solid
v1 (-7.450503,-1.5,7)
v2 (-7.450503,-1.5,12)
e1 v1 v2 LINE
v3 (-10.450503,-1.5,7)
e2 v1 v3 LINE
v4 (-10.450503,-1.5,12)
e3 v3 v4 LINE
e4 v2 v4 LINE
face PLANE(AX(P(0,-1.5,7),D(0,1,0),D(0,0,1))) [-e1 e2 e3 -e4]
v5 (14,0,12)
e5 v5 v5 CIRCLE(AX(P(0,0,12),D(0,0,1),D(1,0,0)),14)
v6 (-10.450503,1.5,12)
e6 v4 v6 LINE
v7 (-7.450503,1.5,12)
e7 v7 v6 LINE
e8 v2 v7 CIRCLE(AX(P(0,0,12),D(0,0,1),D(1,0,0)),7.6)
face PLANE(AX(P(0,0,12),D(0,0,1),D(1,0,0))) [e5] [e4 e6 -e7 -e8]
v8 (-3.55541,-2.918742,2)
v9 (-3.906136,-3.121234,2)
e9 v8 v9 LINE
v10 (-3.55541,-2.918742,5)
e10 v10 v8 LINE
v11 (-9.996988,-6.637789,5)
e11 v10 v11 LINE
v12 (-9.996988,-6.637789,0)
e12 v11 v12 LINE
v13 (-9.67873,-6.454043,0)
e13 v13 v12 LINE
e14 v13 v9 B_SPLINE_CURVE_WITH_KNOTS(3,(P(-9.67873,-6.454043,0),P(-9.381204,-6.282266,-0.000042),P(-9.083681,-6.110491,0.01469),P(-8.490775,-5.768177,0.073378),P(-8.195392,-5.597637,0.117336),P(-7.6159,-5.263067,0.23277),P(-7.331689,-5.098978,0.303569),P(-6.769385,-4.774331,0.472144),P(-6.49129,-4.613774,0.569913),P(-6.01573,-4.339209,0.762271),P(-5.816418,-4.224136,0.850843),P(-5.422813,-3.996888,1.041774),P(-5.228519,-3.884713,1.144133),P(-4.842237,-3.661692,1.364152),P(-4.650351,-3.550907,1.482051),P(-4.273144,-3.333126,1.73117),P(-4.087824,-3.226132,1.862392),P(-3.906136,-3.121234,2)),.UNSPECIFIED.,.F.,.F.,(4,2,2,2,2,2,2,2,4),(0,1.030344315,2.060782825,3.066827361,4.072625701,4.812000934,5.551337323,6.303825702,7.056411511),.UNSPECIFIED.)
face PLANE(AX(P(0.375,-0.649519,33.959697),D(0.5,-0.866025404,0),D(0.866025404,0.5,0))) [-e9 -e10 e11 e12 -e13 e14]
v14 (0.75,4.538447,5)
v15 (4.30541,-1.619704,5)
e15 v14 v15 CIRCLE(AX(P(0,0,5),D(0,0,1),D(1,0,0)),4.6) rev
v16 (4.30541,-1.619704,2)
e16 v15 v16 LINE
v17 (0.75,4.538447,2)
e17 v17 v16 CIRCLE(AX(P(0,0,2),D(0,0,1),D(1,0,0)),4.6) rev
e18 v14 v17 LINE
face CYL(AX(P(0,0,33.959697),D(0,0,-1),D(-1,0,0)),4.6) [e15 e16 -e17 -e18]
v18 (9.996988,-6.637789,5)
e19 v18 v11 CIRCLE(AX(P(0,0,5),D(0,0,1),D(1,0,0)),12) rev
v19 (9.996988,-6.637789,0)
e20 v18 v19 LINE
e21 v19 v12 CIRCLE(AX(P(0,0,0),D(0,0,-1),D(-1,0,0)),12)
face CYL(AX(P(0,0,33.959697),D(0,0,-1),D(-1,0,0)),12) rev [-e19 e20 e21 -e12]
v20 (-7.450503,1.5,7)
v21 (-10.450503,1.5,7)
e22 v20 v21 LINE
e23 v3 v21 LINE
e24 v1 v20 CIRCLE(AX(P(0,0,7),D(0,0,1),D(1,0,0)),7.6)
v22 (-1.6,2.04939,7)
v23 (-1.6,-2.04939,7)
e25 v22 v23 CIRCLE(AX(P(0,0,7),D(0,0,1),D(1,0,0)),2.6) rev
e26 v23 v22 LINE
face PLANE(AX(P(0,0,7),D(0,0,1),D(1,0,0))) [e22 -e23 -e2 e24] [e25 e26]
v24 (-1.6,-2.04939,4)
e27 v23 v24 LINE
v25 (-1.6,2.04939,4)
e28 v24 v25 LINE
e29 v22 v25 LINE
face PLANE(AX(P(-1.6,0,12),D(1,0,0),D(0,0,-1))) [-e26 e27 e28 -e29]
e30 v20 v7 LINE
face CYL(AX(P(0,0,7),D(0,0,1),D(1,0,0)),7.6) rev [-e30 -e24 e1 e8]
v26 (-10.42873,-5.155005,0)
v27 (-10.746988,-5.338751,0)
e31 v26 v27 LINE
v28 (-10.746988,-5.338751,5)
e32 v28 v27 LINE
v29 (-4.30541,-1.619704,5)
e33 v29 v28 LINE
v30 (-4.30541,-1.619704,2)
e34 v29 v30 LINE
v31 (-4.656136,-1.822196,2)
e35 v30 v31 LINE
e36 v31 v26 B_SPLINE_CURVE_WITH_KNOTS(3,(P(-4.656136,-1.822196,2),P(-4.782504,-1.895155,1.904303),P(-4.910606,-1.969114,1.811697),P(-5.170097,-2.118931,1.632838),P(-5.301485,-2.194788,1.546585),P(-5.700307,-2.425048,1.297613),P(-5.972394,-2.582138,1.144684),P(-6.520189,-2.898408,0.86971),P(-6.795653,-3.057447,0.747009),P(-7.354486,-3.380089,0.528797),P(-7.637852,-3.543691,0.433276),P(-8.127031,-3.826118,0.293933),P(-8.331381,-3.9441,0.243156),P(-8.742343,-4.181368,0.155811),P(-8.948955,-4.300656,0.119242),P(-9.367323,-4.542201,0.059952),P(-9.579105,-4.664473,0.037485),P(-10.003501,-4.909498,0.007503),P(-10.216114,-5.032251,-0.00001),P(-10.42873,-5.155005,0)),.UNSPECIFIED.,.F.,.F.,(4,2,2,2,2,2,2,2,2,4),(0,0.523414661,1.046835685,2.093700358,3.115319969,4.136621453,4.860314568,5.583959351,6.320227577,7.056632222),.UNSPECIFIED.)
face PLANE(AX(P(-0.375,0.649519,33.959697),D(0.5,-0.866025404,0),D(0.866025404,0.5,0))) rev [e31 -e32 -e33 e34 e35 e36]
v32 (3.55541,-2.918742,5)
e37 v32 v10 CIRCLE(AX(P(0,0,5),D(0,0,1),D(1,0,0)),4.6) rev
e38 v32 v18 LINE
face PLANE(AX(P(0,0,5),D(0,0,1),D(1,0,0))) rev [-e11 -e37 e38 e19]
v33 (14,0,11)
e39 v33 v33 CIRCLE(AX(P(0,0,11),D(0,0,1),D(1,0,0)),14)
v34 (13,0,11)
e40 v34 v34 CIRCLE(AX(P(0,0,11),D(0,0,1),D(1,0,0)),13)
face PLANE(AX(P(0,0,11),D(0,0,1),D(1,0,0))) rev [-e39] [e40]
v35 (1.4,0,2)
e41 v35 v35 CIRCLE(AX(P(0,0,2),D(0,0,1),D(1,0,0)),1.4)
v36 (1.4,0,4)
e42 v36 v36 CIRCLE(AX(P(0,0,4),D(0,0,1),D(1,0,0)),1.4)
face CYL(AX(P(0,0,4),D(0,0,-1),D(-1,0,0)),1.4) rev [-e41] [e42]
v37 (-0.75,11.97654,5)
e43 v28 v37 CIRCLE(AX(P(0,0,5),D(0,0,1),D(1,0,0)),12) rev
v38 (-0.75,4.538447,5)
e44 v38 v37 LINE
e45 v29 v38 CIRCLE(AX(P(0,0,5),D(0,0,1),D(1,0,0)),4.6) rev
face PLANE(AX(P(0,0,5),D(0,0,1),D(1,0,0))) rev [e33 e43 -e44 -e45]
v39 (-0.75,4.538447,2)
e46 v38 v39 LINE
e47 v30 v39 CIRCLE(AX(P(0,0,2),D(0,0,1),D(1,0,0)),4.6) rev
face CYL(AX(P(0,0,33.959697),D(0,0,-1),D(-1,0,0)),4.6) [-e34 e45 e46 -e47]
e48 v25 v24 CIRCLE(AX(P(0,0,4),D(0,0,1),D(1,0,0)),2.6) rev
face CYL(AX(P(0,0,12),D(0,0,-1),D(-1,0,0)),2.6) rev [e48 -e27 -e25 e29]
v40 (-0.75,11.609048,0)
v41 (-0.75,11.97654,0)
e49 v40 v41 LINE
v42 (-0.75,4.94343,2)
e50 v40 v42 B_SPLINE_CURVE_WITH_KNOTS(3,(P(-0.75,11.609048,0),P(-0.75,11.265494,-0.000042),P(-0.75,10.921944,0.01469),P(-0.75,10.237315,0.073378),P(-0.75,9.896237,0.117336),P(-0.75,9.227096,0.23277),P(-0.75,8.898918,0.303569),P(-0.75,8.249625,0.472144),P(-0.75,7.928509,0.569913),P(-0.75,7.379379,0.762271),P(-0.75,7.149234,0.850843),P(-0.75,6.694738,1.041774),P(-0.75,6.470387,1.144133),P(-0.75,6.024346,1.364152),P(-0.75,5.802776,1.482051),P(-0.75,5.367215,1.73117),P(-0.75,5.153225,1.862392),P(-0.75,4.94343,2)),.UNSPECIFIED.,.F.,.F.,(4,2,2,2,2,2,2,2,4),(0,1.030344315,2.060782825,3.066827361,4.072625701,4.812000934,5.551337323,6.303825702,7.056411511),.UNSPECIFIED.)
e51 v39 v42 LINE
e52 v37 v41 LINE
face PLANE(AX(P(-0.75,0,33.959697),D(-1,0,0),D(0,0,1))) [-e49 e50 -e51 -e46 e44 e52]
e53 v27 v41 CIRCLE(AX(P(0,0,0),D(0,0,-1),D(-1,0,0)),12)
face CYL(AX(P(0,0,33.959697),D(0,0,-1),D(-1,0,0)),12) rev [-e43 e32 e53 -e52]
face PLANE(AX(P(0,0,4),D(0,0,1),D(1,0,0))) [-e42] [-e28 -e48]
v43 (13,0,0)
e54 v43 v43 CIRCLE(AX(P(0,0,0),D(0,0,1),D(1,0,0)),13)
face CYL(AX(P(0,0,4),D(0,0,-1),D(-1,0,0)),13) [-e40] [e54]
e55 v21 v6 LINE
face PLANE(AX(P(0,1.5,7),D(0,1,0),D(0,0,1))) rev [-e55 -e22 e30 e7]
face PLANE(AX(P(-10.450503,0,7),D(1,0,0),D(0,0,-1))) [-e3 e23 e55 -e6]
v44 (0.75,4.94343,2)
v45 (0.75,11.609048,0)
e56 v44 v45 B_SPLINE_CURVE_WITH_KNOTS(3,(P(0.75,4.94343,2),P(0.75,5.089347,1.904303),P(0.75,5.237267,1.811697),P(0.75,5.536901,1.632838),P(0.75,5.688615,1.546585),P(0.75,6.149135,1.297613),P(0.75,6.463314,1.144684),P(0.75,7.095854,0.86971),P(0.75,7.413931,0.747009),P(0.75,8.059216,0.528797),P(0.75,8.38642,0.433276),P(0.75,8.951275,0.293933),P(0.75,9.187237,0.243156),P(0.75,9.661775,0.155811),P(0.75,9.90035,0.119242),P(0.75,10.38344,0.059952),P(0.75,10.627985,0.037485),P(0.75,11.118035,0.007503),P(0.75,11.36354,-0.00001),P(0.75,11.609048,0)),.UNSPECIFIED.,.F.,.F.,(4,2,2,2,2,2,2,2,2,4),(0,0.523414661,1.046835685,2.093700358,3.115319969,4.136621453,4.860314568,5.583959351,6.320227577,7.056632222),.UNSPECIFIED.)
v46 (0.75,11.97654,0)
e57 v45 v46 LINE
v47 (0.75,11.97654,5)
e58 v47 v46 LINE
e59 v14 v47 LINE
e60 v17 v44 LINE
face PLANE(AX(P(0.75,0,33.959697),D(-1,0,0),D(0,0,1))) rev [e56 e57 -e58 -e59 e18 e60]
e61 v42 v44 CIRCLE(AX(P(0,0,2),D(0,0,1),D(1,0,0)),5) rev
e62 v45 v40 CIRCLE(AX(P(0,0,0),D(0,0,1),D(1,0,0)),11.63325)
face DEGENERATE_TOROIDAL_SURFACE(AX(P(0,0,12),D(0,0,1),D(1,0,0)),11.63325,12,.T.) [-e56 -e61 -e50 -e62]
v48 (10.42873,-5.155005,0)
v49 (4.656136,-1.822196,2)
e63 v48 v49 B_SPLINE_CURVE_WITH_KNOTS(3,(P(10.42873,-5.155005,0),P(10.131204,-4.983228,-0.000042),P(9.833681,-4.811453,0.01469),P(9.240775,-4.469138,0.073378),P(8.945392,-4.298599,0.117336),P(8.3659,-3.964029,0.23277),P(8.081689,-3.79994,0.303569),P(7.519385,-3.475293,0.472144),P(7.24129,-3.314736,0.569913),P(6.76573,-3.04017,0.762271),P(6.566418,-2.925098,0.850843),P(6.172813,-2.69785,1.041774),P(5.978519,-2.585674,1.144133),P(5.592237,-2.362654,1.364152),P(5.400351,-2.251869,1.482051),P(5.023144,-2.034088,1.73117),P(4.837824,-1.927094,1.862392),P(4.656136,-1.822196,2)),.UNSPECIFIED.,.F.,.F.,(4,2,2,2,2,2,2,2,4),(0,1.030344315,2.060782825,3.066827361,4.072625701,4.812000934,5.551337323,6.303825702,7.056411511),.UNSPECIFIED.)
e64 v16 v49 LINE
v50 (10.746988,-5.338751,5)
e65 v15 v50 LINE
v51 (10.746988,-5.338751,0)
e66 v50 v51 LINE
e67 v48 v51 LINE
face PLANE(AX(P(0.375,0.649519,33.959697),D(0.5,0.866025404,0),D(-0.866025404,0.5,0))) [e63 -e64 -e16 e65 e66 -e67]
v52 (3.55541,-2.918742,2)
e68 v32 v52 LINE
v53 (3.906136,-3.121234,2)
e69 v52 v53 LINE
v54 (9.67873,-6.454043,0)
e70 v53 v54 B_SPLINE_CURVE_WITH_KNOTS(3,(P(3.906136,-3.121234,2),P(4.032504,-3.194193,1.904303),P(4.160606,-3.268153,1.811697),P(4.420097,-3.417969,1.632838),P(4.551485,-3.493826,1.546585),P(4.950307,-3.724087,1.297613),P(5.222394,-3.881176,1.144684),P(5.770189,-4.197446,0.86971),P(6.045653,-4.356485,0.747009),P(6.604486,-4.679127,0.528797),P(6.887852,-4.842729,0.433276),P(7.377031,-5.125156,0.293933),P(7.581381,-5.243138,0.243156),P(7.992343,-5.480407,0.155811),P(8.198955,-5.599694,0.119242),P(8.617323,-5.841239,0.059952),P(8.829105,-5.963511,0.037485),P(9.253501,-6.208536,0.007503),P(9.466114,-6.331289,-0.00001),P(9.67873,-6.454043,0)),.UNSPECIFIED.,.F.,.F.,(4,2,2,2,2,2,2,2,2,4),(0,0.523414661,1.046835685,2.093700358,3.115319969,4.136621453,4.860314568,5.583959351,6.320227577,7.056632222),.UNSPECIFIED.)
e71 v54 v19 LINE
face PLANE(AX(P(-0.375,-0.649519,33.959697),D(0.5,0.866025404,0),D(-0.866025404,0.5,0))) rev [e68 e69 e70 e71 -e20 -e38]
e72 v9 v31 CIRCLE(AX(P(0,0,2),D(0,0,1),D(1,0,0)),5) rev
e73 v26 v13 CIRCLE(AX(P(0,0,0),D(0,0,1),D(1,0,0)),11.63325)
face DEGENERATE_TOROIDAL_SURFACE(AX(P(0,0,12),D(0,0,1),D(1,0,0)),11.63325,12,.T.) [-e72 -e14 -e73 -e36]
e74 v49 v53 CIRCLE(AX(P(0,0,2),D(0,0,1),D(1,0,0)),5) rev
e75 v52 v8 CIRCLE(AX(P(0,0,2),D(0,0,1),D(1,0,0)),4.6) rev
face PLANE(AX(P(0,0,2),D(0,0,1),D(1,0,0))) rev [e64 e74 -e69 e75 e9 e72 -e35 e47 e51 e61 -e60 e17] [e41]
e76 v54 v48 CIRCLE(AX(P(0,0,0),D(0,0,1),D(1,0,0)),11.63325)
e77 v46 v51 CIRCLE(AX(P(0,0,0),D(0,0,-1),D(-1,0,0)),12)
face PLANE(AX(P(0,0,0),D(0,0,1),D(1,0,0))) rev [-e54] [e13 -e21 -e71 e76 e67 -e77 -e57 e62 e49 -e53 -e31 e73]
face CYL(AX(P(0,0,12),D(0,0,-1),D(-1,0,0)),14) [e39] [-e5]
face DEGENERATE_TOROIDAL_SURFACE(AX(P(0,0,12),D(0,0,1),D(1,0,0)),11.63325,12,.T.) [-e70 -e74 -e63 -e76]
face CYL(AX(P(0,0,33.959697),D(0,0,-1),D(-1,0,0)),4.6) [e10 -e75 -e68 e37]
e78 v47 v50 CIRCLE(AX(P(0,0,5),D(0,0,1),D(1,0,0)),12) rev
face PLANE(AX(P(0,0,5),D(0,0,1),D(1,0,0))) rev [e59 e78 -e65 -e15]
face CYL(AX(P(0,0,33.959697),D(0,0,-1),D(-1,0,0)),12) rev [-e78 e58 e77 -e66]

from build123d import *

# Parameters (mm, degrees)
SKETCH_1_R          = 13
SKETCH_1_R_2        = 2.6
SKETCH_1_R_3        = 1.4
EXTRUDE_1_DEPTH     = 4
SKETCH_1_3_R        = 13
SKETCH_1_3_R_2      = 2.6
EXTRUDE_2_DEPTH     = 12
EXTRUDE_START       = 11
SKETCH_1_6_R        = 14
SKETCH_1_6_R_2      = 13
EXTRUDE_3_DEPTH     = 1
CUT_EXTRUDE_1_DEPTH = 5
SKETCH_6_R          = 7.6
SKETCH_6_W          = 3
SKETCH_6_H          = 3
CUT_EXTRUDE_5_DEPTH = 5
SKETCH_5_R          = 5
CUT_EXTRUDE_6_DEPTH = 2
FILLET_1_R          = 12


with BuildPart() as part:
    # 草图1 → 凸台-拉伸1 (new body)
    # profile 1 of 3: a face of its own
    with BuildSketch(Plane.XY):
        Circle(SKETCH_1_R)
        Circle(SKETCH_1_R_2, mode=Mode.SUBTRACT)
    # profile 2 of 3: a face of its own
    with BuildSketch(Plane.XY):
        with BuildLine():
            Line((-1.6, -2.049390153), (-1.6, 2.049390153))
            ThreePointArc((-1.6, 2.049390153), (-2.6, 0), (-1.6, -2.049390153))
        make_face()
    # profile 3 of 3: a face of its own
    with BuildSketch(Plane.XY):
        with BuildLine():
            ThreePointArc((2.6, 0), (1.140175425, 2.336664289), (-1.6, 2.049390153))
            Line((-1.6, 2.049390153), (-1.6, -2.049390153))
            ThreePointArc((-1.6, -2.049390153), (1.140175425, -2.336664289), (2.6, 0))
        make_face()
        Circle(SKETCH_1_R_3, mode=Mode.SUBTRACT)
    extrude(amount=EXTRUDE_1_DEPTH)

    # 草图1<3> → 凸台-拉伸2 (add)
    # profile 1 of 2: a face of its own
    with BuildSketch(Plane.XY):
        Circle(SKETCH_1_3_R)
        Circle(SKETCH_1_3_R_2, mode=Mode.SUBTRACT)
    # profile 2 of 2: a face of its own
    with BuildSketch(Plane.XY):
        with BuildLine():
            Line((-1.6, -2.049390153), (-1.6, 2.049390153))
            ThreePointArc((-1.6, 2.049390153), (-2.6, 0), (-1.6, -2.049390153))
        make_face()
    extrude(amount=EXTRUDE_2_DEPTH)

    # 草图1<6> → 凸台-拉伸3 (add)
    with BuildSketch(Plane.XY.offset(EXTRUDE_START)):
        Circle(SKETCH_1_6_R)
        Circle(SKETCH_1_6_R_2, mode=Mode.SUBTRACT)
    extrude(amount=EXTRUDE_3_DEPTH)

    # 草图3 → 切除-拉伸1 (cut)
    with BuildSketch(Plane(origin=(0, 0, 0), x_dir=(-1, 0, 0), z_dir=(0, 0, -1))):
        with BuildLine():
            Line((-10.746987514, -5.338750731), (-4.305410284, -1.619704383))
            ThreePointArc((-4.305410284, -1.619704383), (-3.983716857, 2.3), (-0.75, 4.538446871))
            Line((-0.75, 4.538446871), (-0.75, 11.976539567))
            ThreePointArc((-0.75, 11.976539567), (-10.392304845, 6), (-10.746987514, -5.338750731))
        make_face()
        with BuildLine():
            Line((9.996987514, -6.637788836), (3.555410284, -2.918742488))
            ThreePointArc((3.555410284, -2.918742488), (0, -4.6), (-3.555410284, -2.918742488))
            Line((-3.555410284, -2.918742488), (-9.996987514, -6.637788836))
            ThreePointArc((-9.996987514, -6.637788836), (0, -12), (9.996987514, -6.637788836))
        make_face()
        with BuildLine():
            ThreePointArc((4.6, 0), (4.52575338, -0.823138109), (4.305410284, -1.619704383))
            Line((4.305410284, -1.619704383), (10.746987514, -5.338750731))
            ThreePointArc((10.746987514, -5.338750731), (11.682547885, -2.741910814), (12, 0))
            ThreePointArc((12, 0), (8.746427842, 8.215838363), (0.75, 11.976539567))
            Line((0.75, 11.976539567), (0.75, 4.538446871))
            ThreePointArc((0.75, 4.538446871), (3.507848343, 2.975735203), (4.6, 0))
        make_face()
    extrude(amount=-CUT_EXTRUDE_1_DEPTH, mode=Mode.SUBTRACT)

    # 草图6 → 切除-拉伸5 (cut)
    with BuildSketch(Plane.XY.offset(12)):
        Circle(SKETCH_6_R)
        with Locations((-8.950503339, 0)):
            Rectangle(SKETCH_6_W, SKETCH_6_H)
    extrude(amount=-CUT_EXTRUDE_5_DEPTH, mode=Mode.SUBTRACT)

    # 草图5 → 切除-拉伸6 (cut)
    with BuildSketch(Plane(origin=(0, 0, 0), x_dir=(-1, 0, 0), z_dir=(0, 0, -1))):
        Circle(SKETCH_5_R)
    extrude(amount=-CUT_EXTRUDE_6_DEPTH, mode=Mode.SUBTRACT)

    # 圆角1
    # the kernel refuses this fillet: 12 mm, written as the material it takes off along each edge
    with BuildSketch(Plane(origin=(0, 0, 0), x_dir=(-0.0031415874858860904, -0.9999950652018581, 0), z_dir=(0.9999950652018581, -0.0031415874858860904, 0))) as fillet_1_piece_1:
        with BuildLine():
            CenterArc((11.633249581, -12), FILLET_1_R, 90, 33.557309762)
            Line((5, -2), (5, 0))
            Line((5, 0), (11.633249581, 0))
        make_face()
    revolve(axis=Axis((0, 0, 0), (0, 0, -1)), revolution_arc=359.64, mode=Mode.SUBTRACT)
    with BuildSketch(Plane(origin=(0, 0, 0), x_dir=(0.8675919238668026, 0.49727683802998507, 0), z_dir=(-0.49727683802998507, 0.8675919238668026, 0))) as fillet_1_piece_2:
        with BuildLine():
            CenterArc((11.633249581, -12), FILLET_1_R, 90, 33.557309762)
            Line((5, -2), (5, 0))
            Line((5, 0), (11.633249581, 0))
        make_face()
    revolve(axis=Axis((0, 0, 0), (0, 0, -1)), revolution_arc=359.64, mode=Mode.SUBTRACT)
    with BuildSketch(Plane(origin=(0, 0, 0), x_dir=(-0.8644503363809427, 0.5027182271719167, 0), z_dir=(-0.5027182271719167, -0.8644503363809427, 0))) as fillet_1_piece_3:
        with BuildLine():
            CenterArc((11.633249581, -12), FILLET_1_R, 90, 33.557309762)
            Line((5, -2), (5, 0))
            Line((5, 0), (11.633249581, 0))
        make_face()
    revolve(axis=Axis((0, 0, 0), (0, 0, -1)), revolution_arc=359.64, mode=Mode.SUBTRACT)


solid = part.part
